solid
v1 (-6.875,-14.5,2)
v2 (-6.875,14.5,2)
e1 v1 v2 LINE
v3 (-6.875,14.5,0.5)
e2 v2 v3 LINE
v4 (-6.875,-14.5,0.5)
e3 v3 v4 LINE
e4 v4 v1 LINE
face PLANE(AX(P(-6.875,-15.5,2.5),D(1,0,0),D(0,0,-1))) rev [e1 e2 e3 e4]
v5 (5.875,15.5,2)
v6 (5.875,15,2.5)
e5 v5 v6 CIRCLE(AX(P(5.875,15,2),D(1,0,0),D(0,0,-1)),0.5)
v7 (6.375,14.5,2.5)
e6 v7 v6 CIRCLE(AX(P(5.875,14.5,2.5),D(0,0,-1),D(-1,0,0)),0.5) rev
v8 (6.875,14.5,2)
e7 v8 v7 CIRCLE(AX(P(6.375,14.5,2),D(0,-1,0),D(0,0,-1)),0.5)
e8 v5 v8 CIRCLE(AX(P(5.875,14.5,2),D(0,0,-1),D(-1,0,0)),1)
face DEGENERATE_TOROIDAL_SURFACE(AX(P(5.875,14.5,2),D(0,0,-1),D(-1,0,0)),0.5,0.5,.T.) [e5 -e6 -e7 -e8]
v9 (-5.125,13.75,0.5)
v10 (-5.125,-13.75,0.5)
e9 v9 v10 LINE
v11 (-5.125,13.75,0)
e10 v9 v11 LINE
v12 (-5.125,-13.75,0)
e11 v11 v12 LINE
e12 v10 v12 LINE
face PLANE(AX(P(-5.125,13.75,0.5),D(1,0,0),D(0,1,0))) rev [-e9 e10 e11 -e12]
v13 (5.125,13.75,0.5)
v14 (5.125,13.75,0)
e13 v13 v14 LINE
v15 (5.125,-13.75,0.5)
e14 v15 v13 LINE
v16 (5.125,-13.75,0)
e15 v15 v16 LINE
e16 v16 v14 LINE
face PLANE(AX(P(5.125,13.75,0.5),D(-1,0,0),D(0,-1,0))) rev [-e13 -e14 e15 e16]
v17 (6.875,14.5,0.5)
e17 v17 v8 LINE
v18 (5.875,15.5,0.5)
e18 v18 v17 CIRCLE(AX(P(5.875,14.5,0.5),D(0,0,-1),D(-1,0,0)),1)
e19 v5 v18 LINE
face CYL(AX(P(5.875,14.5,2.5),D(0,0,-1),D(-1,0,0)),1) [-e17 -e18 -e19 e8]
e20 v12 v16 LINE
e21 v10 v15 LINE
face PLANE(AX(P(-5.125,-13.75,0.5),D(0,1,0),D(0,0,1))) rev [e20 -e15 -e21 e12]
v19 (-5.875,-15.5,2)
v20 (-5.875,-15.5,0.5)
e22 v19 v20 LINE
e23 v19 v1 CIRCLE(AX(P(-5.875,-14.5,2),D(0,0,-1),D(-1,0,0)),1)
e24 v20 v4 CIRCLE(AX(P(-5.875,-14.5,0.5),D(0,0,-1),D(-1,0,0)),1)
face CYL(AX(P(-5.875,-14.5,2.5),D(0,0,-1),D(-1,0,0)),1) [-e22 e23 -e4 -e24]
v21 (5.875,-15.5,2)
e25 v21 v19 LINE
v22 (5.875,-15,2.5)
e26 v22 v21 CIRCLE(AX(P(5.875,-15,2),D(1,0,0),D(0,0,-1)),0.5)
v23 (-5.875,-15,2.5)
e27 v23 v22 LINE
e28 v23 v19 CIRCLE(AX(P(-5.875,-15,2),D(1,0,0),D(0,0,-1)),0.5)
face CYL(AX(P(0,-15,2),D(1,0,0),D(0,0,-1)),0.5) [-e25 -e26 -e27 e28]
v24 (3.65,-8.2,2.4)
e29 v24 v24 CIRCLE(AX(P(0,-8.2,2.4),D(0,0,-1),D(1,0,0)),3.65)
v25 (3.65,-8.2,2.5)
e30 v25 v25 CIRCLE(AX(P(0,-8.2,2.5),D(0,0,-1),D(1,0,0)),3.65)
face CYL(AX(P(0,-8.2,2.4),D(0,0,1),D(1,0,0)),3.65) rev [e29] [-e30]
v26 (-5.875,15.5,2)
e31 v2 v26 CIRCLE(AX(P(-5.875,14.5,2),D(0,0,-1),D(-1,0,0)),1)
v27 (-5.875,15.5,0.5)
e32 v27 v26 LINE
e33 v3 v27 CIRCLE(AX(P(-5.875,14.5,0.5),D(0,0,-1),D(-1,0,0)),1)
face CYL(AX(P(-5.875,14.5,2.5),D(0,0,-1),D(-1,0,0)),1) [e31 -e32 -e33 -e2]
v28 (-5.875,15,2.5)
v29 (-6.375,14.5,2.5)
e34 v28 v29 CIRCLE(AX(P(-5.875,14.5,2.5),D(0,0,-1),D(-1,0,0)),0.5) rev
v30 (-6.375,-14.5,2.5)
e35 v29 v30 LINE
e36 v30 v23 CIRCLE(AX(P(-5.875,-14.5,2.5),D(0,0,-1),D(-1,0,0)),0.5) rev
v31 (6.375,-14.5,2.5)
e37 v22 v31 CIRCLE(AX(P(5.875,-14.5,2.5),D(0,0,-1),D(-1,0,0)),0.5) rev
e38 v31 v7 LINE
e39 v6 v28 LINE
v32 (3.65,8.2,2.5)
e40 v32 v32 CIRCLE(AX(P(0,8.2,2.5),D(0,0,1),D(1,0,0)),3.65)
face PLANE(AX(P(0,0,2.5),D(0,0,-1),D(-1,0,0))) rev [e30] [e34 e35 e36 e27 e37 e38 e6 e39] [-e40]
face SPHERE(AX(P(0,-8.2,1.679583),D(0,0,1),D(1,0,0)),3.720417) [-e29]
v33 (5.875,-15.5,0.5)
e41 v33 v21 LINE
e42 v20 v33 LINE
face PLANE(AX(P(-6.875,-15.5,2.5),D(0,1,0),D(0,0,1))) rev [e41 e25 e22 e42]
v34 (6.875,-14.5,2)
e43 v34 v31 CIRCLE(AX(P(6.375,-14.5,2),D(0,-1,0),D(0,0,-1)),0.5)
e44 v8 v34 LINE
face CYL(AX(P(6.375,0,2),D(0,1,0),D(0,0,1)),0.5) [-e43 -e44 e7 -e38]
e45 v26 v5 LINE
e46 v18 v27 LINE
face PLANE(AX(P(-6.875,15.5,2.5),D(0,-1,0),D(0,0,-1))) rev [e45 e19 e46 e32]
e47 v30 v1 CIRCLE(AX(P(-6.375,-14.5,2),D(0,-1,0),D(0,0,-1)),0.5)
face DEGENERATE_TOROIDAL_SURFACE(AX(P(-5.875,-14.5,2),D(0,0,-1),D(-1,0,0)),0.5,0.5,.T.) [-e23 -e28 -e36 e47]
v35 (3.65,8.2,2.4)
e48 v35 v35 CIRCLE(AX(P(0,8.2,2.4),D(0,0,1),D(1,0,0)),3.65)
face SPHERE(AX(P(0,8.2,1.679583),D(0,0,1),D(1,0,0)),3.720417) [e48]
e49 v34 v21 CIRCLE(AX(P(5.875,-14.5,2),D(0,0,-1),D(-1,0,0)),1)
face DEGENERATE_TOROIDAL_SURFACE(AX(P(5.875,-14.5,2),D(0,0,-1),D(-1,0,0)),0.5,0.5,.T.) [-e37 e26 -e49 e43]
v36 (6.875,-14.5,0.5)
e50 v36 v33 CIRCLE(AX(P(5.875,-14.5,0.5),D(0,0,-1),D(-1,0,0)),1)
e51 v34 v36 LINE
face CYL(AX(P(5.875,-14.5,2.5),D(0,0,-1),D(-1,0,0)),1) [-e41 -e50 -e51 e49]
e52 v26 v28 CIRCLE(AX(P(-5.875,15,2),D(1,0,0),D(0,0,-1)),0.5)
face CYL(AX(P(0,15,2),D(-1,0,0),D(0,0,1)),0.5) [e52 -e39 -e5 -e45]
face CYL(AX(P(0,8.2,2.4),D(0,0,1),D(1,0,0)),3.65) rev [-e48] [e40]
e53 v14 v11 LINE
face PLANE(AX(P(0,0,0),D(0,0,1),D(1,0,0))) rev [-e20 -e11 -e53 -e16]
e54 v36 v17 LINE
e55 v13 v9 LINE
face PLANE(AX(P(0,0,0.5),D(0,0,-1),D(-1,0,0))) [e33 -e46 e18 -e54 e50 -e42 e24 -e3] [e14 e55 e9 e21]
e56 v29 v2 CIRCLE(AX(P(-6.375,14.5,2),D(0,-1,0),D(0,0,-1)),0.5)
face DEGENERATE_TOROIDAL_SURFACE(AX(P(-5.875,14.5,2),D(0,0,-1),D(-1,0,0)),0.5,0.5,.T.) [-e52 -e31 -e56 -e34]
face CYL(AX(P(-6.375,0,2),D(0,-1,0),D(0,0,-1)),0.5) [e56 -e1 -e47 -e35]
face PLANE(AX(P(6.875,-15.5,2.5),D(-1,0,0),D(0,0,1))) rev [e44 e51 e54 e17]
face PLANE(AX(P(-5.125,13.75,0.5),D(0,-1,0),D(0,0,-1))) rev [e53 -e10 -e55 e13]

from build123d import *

# Parameters (mm, degrees)
SKETCH1_W           = 10.25
SKETCH1_H           = 27.5
BOSS_EXTRUDE1_DEPTH = 0.5
SKETCH2_W           = 13.75
SKETCH2_H           = 31
BOSS_EXTRUDE2_DEPTH = 2
FILLET1_R           = 1
FILLET2_R           = 0.5
SKETCH3_R           = 3.65
CUT_EXTRUDE1_DEPTH  = 0.1


# Read off the part's stored shape, not the designer's step: Dome1, Dome2
with BuildPart() as part:
    # Sketch1 → Boss-Extrude1 (new body)
    with BuildSketch(Plane.XY):
        Rectangle(SKETCH1_W, SKETCH1_H)
    extrude(amount=BOSS_EXTRUDE1_DEPTH)

    # Sketch2 → Boss-Extrude2 (add)
    with BuildSketch(Plane.XY.offset(0.5)):
        Rectangle(SKETCH2_W, SKETCH2_H)
    extrude(amount=BOSS_EXTRUDE2_DEPTH)

    # Fillet1
    fillet1_edges = [part.edges().sort_by_distance(p)[0] for p in [
        (6.875, -15.5, 1.5),
        (6.875, 15.5, 1.5),
        (-6.875, 15.5, 1.5),
        (-6.875, -15.5, 1.5),
    ]]
    fillet(fillet1_edges, radius=FILLET1_R)

    # Fillet2
    fillet2_edges = [part.edges().sort_by_distance(p)[0] for p in [
        (0, 15.5, 2.5),
        (6.875, 0, 2.5),
        (-6.875, 0, 2.5),
        (0, -15.5, 2.5),
        (-6.582106781, 15.207106781, 2.5),
        (-6.582106781, -15.207106781, 2.5),
        (6.582106781, -15.207106781, 2.5),
        (6.582106781, 15.207106781, 2.5),
    ]]
    fillet(fillet2_edges, radius=FILLET2_R)

    # Sketch3 → Cut-Extrude1 (cut)
    with BuildSketch(Plane.XY.offset(2.5)):
        with Locations((0, 8.2)):
            Circle(SKETCH3_R)
    cut_extrude1 = extrude(amount=-CUT_EXTRUDE1_DEPTH, mode=Mode.SUBTRACT)

    # Mirror1: Cut-Extrude1 across plane
    add(cut_extrude1.mirror(Plane.ZX), mode=Mode.SUBTRACT)

    # Dome1 outline → Dome1 (revolve)
    with BuildSketch(Plane.XZ.offset(-8.2)):
        with BuildLine():
            Line((0, 2.4), (3.650000001, 2.399999996))
            ThreePointArc((3.650000001, 2.399999996), (2.362334652, 4.553757157), (0, 5.4))
            Line((0, 5.4), (0, 2.4))
        make_face()
    revolve(axis=Axis((0, 8.2, 0), (0, 0, 1)))

    # Dome2 outline → Dome2 (revolve)
    with BuildSketch(Plane.XZ.offset(8.2)):
        with BuildLine():
            Line((0, 2.4), (3.650000001, 2.399999996))
            ThreePointArc((3.650000001, 2.399999996), (2.362334652, 4.553757157), (0, 5.4))
            Line((0, 5.4), (0, 2.4))
        make_face()
    revolve(axis=Axis((0, -8.2, 0), (0, 0, 1)))


solid = part.part
